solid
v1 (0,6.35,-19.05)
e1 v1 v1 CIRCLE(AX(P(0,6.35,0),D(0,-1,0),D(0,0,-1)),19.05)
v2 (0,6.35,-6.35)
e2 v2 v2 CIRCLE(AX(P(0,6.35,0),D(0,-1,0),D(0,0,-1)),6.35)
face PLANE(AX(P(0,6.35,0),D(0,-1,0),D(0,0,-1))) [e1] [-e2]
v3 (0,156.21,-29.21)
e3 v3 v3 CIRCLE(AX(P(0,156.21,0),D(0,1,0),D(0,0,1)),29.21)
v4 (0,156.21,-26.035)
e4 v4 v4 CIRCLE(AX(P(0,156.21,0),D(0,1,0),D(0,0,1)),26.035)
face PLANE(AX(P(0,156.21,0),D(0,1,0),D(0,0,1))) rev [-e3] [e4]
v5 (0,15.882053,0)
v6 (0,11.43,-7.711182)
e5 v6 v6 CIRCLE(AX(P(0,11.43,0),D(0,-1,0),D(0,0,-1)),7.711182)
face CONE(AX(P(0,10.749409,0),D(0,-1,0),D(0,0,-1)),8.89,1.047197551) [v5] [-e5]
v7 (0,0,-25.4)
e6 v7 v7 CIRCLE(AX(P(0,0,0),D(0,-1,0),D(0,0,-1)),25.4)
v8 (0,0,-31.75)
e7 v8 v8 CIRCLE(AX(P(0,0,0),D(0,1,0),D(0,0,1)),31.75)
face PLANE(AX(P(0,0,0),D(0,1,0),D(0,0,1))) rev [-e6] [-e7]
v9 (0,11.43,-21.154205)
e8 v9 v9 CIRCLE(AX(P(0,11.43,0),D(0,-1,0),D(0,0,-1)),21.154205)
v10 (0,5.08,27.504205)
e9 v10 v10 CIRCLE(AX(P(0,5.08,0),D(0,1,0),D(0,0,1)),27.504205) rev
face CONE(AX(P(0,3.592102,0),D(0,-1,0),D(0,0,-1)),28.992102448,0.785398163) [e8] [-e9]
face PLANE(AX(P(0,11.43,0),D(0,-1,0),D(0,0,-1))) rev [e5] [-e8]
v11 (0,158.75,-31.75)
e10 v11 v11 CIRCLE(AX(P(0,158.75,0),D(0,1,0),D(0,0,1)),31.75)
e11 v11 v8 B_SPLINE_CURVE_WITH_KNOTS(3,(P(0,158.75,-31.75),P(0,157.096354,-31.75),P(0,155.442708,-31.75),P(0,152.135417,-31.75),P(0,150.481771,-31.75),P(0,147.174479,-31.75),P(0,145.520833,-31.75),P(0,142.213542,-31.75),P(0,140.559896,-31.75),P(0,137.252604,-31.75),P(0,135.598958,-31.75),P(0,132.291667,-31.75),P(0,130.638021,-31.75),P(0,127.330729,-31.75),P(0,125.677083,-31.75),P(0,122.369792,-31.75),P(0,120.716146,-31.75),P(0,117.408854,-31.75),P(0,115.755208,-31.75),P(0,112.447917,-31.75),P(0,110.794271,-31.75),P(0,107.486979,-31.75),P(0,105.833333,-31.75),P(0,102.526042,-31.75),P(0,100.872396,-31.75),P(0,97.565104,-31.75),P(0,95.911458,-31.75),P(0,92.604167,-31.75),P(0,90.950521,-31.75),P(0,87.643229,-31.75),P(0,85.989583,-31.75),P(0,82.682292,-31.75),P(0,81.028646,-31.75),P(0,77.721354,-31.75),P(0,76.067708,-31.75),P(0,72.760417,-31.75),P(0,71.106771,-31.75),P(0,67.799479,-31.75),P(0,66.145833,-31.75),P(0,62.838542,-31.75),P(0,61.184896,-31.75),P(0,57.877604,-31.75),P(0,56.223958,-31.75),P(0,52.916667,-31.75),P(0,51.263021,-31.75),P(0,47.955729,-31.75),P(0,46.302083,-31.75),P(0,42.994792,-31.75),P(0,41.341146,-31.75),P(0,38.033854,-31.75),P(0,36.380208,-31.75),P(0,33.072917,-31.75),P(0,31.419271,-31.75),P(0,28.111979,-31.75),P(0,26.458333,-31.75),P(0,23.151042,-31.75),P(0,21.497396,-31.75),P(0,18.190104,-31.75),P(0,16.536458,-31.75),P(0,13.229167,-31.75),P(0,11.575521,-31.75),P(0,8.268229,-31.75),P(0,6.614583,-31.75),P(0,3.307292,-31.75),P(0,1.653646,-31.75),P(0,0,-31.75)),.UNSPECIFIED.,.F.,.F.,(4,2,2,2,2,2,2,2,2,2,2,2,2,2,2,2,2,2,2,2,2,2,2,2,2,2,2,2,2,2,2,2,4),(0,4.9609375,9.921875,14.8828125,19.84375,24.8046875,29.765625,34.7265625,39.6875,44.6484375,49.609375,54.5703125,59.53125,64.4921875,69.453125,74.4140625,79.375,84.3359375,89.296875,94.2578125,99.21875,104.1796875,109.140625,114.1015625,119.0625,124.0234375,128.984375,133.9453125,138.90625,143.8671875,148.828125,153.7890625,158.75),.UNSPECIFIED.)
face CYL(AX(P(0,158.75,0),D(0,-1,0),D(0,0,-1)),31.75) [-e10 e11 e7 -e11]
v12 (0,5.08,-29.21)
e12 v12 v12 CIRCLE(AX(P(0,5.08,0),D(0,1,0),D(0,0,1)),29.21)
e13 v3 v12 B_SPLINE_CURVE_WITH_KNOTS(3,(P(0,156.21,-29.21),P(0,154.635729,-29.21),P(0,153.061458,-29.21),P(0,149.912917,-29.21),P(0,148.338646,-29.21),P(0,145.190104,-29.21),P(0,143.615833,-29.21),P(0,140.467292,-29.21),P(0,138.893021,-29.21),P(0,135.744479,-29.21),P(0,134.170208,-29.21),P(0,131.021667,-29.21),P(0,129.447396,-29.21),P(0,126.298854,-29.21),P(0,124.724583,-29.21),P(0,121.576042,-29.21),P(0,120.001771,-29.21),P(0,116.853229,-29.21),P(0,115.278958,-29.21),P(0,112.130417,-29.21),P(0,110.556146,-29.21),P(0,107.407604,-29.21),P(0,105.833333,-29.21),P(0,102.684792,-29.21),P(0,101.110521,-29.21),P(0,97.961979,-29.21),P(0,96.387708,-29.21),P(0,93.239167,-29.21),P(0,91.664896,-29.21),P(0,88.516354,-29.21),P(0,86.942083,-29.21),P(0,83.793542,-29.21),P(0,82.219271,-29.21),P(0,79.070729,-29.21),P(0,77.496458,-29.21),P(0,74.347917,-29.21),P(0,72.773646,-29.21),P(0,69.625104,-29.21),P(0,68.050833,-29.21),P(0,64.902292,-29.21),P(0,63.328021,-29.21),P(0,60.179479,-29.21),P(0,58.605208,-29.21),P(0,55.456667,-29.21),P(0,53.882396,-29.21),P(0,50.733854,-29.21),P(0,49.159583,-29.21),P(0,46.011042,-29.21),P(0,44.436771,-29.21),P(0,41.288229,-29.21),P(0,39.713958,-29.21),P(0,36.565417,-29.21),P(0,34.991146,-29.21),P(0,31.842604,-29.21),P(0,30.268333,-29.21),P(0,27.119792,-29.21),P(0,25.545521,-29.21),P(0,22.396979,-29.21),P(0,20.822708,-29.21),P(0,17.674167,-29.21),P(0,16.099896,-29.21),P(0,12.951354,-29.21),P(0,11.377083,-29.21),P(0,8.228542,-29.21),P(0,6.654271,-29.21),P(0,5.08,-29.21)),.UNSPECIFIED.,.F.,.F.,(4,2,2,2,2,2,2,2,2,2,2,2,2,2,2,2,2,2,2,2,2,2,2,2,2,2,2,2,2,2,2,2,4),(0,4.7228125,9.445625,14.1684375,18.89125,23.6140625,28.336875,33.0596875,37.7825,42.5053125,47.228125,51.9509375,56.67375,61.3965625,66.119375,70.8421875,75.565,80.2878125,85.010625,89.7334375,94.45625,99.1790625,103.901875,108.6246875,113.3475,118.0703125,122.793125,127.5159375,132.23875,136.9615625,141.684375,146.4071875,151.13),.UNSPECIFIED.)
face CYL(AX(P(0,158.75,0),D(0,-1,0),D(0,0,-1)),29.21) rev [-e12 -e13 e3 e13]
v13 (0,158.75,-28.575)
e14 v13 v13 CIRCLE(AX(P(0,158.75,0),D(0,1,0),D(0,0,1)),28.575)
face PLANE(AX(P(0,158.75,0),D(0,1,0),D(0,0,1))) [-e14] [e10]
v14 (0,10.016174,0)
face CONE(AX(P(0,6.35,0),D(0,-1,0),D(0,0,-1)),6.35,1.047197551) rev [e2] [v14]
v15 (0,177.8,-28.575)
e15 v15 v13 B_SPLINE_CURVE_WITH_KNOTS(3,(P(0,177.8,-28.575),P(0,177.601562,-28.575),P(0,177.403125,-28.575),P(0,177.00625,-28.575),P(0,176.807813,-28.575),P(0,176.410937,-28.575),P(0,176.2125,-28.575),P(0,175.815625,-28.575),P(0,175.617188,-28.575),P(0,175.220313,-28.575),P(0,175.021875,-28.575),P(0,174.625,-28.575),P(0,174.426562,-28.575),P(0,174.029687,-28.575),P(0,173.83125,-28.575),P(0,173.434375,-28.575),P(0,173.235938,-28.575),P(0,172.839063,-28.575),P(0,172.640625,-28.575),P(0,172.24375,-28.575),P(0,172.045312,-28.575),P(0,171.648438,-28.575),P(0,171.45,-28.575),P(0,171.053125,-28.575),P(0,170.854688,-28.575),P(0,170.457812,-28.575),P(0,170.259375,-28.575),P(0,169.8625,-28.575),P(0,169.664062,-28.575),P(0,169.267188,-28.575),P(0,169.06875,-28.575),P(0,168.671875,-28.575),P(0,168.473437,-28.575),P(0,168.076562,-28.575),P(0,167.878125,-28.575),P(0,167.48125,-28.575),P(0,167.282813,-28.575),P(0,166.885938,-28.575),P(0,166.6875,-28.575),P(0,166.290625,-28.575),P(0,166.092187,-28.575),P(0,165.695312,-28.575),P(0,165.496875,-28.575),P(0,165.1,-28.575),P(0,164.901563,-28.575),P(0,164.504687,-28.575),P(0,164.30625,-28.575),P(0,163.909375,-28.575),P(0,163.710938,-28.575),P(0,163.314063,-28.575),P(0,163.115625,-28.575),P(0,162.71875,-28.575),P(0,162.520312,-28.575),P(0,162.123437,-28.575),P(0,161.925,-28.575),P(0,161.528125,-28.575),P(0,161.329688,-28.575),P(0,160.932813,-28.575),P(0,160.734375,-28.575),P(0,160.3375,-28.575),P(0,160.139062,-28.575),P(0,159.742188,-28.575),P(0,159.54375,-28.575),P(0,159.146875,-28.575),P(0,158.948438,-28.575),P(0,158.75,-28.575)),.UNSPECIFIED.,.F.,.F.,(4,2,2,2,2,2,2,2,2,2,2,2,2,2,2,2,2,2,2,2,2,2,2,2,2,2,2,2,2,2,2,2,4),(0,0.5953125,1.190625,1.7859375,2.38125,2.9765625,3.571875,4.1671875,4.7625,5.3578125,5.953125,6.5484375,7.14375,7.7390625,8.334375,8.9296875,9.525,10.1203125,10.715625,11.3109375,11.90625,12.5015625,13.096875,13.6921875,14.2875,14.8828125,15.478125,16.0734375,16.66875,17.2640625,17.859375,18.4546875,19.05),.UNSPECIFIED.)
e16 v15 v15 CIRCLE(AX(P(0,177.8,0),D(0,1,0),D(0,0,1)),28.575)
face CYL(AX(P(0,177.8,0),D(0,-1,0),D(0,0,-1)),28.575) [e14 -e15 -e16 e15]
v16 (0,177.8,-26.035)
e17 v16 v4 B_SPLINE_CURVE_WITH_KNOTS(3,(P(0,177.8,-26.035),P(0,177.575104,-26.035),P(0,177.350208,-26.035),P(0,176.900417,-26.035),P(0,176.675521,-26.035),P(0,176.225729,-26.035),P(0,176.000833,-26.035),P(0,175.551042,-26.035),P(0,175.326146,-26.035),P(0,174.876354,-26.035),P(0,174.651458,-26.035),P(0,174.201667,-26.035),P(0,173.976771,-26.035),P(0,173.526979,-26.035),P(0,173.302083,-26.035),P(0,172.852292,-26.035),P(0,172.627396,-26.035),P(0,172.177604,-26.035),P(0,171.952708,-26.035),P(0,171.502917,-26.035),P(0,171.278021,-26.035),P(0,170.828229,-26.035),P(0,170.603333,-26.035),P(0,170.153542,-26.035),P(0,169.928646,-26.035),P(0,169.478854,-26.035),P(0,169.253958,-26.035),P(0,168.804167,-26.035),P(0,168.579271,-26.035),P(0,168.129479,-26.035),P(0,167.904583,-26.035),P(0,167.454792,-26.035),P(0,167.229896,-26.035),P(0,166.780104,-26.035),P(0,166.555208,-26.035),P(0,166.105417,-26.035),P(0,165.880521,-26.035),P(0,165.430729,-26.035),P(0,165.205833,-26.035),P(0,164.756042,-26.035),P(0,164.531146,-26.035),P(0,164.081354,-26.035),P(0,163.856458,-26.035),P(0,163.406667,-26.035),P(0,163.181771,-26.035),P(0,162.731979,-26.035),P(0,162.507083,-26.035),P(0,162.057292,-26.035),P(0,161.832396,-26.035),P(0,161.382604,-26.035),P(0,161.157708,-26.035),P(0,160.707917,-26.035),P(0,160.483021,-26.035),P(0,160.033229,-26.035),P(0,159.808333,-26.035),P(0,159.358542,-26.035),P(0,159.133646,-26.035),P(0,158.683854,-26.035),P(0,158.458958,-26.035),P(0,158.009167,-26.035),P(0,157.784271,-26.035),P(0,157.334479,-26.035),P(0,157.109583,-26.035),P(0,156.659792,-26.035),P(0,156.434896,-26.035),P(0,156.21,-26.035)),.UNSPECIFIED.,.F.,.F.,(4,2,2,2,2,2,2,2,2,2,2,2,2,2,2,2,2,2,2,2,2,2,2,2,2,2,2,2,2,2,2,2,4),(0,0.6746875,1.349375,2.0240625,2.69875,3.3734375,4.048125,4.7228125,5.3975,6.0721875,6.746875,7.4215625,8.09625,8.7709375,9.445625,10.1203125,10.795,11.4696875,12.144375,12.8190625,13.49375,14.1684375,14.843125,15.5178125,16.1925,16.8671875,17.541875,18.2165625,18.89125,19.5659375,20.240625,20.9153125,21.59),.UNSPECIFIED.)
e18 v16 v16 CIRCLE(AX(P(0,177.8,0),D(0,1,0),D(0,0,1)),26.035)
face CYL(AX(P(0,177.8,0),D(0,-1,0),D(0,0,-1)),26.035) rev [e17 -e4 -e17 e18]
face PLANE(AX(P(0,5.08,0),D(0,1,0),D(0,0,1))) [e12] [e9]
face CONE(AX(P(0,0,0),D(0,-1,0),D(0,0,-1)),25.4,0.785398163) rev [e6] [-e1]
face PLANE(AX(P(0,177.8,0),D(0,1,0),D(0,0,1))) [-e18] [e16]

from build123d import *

# Parameters (mm, degrees)
SKETCH2_R           = 31.75
BOSS_EXTRUDE1_DEPTH = 158.75
SKETCH3_R           = 28.575
BOSS_EXTRUDE2_DEPTH = 19.05
SKETCH4_R           = 25.4
CUT_EXTRUDE1_DEPTH  = 6.35
SKETCH5_R           = 6.35
CUT_EXTRUDE2_DEPTH  = 5.08
DRAFT2_ANGLE        = 45


# Read off the part's stored shape, not the designer's step: Draft3, Shell1
with BuildPart() as part:
    # Sketch2 → Boss-Extrude1 (new body)
    with BuildSketch(Plane(origin=(0, 0, 0), x_dir=(1, 0, 0), z_dir=(0, 1, 0))):
        with Locations(Location((0, 0, 0), (0, 0, 90))):
            Circle(SKETCH2_R)
    extrude(amount=BOSS_EXTRUDE1_DEPTH)

    # Sketch3 → Boss-Extrude2 (add)
    with BuildSketch(Plane(origin=(0, 158.75, 0), x_dir=(1, 0, 0), z_dir=(0, 1, 0))):
        with Locations(Location((0, 0, 0), (0, 0, 90))):
            Circle(SKETCH3_R)
    extrude(amount=BOSS_EXTRUDE2_DEPTH)

    # Sketch4 → Cut-Extrude1 (cut)
    with BuildSketch(Plane.XZ):
        with Locations(Location((0, 0, 0), (0, 0, 270))):
            Circle(SKETCH4_R)
    extrude(amount=-CUT_EXTRUDE1_DEPTH, mode=Mode.SUBTRACT)

    # Sketch5 → Cut-Extrude2 (cut)
    with BuildSketch(Plane.XZ.offset(-6.35)):
        with Locations(Location((0, 0, 0), (0, 0, 270))):
            Circle(SKETCH5_R)
    extrude(amount=-CUT_EXTRUDE2_DEPTH, mode=Mode.SUBTRACT)

    # Draft2
    draft2_faces = [part.faces().sort_by_distance(p)[0] for p in [
        (0, 3.175, 25.4),
    ]]
    draft(draft2_faces, Plane(origin=(0, 0, 0), x_dir=(0, 0, -1), z_dir=(0, -1, 0)), DRAFT2_ANGLE)

    # Draft3 outline → Draft3 (revolve)
    with BuildSketch(Plane.XY):
        Polygon((6.35, 6.35), (6.35, 11.43), (0, 11.43), (0, 10.016174209), align=None)
    revolve(axis=Axis((0, 0, 0), (0, 1, 0)))

    # Shell1 outline → Shell1 (revolve, cut)
    with BuildSketch(Plane.XY):
        Polygon((29.21, 156.21), (26.035, 156.21), (26.035, 177.8), (0, 177.8), (0, 15.882052944), (7.711181898, 11.43), (21.154204897, 11.43), (27.504204897, 5.08), (29.21, 5.08), align=None)
    revolve(axis=Axis((0, 0, 0), (0, 1, 0)), mode=Mode.SUBTRACT)


solid = part.part
